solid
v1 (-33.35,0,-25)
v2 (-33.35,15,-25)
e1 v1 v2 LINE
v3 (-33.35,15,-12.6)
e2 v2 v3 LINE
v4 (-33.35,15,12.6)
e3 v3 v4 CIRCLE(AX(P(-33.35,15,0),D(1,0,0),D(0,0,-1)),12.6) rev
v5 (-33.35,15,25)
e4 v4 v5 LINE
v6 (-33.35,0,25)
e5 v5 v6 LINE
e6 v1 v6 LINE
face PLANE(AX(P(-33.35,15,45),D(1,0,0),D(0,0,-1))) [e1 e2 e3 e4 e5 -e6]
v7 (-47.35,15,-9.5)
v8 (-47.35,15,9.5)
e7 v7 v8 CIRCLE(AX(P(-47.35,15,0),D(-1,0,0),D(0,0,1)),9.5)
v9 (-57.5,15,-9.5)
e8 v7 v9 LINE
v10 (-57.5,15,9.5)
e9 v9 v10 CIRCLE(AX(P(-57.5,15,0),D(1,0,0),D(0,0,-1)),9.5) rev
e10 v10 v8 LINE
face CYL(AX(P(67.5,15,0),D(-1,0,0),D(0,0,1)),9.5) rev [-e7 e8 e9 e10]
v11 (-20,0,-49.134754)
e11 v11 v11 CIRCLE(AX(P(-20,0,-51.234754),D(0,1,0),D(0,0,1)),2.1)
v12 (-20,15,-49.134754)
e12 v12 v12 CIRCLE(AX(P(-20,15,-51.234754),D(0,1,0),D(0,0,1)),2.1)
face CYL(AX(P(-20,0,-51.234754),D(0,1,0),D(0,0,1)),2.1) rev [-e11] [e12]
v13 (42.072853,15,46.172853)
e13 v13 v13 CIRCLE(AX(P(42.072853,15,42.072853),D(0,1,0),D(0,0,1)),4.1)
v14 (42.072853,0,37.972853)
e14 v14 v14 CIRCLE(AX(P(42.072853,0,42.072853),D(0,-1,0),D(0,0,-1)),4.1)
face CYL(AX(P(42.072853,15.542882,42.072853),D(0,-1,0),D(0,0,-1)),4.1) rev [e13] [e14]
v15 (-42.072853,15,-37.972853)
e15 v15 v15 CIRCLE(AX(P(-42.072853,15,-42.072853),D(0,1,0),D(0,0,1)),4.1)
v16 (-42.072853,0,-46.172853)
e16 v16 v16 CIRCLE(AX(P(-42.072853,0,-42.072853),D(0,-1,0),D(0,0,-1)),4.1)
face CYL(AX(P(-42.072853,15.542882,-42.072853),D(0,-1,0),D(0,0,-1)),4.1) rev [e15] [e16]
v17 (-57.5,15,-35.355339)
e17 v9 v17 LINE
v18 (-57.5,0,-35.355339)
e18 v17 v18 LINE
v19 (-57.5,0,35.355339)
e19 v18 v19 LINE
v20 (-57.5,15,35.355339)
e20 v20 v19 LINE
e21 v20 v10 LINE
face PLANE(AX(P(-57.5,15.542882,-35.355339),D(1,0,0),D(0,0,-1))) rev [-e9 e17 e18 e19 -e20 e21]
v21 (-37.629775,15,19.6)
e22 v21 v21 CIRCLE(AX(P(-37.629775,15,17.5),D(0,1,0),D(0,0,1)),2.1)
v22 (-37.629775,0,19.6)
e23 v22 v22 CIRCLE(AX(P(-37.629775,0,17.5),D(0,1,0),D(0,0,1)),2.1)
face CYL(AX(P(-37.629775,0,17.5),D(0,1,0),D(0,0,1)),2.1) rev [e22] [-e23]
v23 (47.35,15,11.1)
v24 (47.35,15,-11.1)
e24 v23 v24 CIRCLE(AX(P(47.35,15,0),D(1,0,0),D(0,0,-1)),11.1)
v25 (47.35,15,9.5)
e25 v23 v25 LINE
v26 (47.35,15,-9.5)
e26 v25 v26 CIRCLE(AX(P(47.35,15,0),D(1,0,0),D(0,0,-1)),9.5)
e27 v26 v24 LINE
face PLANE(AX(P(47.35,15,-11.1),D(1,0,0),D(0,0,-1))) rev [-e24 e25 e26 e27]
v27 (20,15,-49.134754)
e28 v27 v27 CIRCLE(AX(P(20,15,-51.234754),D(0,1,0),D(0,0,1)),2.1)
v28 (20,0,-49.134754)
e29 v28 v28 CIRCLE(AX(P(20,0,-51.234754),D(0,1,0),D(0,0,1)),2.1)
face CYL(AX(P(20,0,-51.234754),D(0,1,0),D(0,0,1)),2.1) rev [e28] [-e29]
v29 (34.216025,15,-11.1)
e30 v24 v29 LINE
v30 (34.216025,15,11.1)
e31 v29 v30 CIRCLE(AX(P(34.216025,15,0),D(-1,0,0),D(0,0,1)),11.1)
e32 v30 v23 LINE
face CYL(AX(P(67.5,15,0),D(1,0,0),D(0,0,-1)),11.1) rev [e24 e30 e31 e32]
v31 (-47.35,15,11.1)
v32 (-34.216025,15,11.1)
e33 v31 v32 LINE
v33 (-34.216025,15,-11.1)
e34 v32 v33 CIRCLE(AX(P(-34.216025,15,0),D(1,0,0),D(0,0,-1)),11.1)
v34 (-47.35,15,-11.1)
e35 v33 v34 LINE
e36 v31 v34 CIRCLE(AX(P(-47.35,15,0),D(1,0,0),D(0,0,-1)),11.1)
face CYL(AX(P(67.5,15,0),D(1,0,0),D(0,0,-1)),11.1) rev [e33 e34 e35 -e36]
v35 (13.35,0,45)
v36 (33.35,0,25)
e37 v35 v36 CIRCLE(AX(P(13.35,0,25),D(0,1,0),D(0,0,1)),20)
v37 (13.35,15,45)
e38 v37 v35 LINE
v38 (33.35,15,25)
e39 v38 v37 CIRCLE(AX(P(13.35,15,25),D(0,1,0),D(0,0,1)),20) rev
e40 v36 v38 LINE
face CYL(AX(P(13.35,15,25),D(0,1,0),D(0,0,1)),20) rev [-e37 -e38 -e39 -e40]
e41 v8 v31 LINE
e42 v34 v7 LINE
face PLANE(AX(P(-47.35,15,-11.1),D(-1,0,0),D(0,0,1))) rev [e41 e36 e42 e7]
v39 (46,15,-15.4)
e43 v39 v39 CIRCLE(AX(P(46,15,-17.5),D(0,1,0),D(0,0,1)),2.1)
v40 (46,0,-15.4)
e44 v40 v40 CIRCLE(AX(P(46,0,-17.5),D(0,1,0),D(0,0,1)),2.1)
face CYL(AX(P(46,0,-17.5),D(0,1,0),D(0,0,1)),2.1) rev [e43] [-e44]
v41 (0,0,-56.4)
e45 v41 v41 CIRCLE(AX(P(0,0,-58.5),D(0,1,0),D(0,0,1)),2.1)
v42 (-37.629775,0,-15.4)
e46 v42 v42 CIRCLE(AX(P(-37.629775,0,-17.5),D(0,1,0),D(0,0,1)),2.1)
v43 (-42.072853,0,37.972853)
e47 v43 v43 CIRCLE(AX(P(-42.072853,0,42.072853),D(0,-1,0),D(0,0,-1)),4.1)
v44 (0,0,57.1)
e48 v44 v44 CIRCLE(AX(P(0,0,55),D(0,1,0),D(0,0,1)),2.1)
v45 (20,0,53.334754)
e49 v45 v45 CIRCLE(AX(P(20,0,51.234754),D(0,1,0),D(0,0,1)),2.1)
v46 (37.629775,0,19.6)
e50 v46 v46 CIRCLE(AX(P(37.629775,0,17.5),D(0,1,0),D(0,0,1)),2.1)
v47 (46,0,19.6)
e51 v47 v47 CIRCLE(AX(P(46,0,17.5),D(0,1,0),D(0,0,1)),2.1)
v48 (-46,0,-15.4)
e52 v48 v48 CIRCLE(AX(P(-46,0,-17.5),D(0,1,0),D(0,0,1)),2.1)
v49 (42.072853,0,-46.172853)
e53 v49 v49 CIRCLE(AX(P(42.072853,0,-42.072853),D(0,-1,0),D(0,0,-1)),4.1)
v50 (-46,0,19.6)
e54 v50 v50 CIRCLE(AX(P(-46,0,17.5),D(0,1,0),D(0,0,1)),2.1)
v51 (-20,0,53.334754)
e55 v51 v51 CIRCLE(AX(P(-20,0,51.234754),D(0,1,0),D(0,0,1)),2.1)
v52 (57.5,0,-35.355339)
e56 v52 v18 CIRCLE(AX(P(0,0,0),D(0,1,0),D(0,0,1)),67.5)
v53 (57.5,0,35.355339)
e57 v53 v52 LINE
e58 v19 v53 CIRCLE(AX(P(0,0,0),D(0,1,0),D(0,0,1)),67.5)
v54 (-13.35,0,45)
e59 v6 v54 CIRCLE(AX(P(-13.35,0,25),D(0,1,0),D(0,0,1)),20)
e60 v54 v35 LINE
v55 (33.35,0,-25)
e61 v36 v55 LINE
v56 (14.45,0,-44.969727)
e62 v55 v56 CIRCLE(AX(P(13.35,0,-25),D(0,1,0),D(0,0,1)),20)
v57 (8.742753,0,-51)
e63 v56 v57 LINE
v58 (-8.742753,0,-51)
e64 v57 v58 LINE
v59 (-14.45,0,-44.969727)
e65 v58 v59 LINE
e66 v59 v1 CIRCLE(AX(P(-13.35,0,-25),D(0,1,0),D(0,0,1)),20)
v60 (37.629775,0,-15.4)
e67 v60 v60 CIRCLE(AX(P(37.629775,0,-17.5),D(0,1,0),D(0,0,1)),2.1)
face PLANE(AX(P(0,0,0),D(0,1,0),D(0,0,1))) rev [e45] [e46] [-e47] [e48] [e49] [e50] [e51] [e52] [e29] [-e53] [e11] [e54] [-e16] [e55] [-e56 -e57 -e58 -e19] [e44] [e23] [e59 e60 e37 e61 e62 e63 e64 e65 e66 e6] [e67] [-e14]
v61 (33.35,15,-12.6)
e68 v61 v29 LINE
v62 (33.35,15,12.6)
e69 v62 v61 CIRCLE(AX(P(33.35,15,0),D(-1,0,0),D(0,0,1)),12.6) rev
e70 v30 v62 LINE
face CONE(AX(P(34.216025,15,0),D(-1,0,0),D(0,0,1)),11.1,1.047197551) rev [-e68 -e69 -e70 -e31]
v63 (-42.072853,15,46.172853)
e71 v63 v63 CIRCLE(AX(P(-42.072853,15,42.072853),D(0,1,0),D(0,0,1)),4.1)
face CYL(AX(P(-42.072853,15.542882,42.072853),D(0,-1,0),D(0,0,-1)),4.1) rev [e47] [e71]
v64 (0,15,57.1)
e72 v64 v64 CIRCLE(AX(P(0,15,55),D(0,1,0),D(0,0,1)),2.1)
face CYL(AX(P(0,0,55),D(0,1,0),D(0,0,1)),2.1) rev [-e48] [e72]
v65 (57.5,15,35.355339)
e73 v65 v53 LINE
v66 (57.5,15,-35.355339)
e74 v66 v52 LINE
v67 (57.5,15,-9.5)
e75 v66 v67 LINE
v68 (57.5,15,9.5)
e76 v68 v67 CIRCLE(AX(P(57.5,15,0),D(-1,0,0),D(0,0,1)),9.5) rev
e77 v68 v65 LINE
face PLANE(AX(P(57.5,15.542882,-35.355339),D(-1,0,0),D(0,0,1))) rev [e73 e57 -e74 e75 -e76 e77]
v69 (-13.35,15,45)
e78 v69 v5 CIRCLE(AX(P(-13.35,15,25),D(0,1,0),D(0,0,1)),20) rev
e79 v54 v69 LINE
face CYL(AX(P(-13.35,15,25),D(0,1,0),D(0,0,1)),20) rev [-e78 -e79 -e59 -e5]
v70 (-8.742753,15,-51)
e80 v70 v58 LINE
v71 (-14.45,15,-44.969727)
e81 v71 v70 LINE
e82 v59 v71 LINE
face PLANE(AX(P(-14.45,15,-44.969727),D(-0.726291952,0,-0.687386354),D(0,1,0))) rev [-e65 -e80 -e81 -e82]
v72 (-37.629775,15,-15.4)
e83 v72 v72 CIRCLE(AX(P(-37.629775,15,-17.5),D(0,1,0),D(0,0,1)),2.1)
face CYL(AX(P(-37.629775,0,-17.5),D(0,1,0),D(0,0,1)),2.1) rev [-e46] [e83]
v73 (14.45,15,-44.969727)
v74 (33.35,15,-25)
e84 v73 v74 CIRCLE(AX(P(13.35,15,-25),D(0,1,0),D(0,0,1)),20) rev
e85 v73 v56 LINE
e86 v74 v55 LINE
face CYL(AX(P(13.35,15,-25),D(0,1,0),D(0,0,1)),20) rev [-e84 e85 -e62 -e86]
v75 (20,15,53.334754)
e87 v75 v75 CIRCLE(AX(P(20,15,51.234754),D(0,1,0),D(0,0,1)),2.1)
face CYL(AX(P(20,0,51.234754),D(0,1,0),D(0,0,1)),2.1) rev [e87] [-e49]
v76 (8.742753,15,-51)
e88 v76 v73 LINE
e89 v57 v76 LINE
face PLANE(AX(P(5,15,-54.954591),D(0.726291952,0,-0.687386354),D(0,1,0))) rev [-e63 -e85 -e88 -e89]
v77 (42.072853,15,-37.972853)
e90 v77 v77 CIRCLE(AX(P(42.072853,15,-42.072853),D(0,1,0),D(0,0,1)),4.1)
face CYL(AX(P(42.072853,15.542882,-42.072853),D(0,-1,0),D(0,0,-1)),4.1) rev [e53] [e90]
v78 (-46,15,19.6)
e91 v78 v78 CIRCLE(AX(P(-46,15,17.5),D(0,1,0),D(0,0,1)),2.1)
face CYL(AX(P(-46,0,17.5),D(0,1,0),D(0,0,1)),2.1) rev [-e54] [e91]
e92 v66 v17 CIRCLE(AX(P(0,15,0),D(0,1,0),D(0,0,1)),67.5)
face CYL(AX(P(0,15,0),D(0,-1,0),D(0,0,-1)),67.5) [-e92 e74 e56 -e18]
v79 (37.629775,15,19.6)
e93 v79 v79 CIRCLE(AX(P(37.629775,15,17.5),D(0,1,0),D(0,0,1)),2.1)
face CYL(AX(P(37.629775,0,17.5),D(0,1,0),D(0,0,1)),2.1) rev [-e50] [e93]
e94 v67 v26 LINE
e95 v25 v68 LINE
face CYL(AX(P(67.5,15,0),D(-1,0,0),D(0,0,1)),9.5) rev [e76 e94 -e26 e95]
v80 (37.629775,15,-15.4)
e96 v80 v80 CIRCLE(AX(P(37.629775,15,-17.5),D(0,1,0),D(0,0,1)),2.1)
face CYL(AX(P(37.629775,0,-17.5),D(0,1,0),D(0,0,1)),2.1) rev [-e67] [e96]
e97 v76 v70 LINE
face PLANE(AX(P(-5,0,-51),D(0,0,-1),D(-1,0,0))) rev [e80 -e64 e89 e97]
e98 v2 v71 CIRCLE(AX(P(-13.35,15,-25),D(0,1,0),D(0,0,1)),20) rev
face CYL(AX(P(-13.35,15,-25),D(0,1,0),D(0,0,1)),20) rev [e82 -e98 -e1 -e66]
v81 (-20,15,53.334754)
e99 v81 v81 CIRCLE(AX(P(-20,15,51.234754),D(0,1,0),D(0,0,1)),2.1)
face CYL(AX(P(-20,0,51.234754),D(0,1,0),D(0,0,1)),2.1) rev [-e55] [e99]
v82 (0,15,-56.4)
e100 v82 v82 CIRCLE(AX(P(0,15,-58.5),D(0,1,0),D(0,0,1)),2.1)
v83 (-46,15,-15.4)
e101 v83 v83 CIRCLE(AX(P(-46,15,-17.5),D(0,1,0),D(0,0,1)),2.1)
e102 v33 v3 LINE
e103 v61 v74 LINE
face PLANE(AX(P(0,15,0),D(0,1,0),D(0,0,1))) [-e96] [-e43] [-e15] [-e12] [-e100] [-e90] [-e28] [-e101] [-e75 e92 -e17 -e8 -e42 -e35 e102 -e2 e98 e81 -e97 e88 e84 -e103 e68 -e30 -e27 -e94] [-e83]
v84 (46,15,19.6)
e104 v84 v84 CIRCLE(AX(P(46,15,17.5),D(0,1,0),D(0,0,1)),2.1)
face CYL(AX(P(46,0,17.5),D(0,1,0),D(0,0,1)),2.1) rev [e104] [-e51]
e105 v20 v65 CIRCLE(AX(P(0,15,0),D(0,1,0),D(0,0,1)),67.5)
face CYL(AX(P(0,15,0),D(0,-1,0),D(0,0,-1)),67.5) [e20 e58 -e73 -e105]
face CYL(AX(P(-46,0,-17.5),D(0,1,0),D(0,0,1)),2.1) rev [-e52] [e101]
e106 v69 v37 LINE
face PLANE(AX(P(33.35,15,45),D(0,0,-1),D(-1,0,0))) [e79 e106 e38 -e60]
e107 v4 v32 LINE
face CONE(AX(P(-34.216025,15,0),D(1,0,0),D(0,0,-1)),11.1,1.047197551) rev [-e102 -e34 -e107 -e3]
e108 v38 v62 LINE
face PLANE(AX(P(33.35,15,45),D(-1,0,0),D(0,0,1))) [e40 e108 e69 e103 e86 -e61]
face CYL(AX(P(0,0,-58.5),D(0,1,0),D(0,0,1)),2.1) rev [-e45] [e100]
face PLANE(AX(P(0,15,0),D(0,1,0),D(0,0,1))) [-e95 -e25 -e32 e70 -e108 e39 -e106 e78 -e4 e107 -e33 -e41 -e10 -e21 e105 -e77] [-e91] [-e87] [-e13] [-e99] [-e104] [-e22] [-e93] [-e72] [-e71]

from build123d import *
from OCP.BRepFilletAPI import BRepFilletAPI_MakeChamfer

# Parameters (mm, degrees)
SKETCH2_R               = 67.5
SKETCH2_W               = 66.7
SKETCH2_H               = 90
BOSS_EXTRUDE1_DEPTH     = 15
SKETCH7_W               = 14
SKETCH7_H               = 11.1
CUT_EXTRUDE1_DEPTH      = 135.058839694
CUT_EXTRUDE1_DEPTH_BACK = 135.058839694
SKETCH8_R               = 9.5
FILLET1_R               = 20
SKETCH9_R               = 2.1
CUT_EXTRUDE2_DEPTH      = 97.630740606
CHAMFER1_SIZE           = 1.5
CHAMFER1_SIZE2          = 0.866025404
SKETCH10_R              = 4.1
CUT_EXTRUDE3_DEPTH      = 97.630740606
CUT_EXTRUDE4_DEPTH      = 97.630740606
SKETCH12_W              = 10
SKETCH12_H              = 6
CUT_EXTRUDE5_DEPTH      = 97.630740606
CHAMFER2_START          = -1
CHAMFER2_DEPTH          = 16
CUT_EXTRUDE6_DEPTH      = 97.630740606


with BuildPart() as part:
    # Sketch2 → Boss-Extrude1 (new body)
    with BuildSketch(Plane(origin=(0, 0, 0), x_dir=(1, 0, 0), z_dir=(0, 1, 0))):
        with Locations(Location((0, 0, 0), (0, 0, 270))):
            Circle(SKETCH2_R)
        Rectangle(SKETCH2_W, SKETCH2_H, mode=Mode.SUBTRACT)
    extrude(amount=BOSS_EXTRUDE1_DEPTH)

    # Sketch7 → Cut-Revolve2 (revolve, cut)
    with BuildSketch(Plane(origin=(0, 15, 0), x_dir=(1, 0, 0), z_dir=(0, 1, 0))):
        with Locations((-40.35, 5.55)):
            Rectangle(SKETCH7_W, SKETCH7_H)
        with Locations((40.35, 5.55)):
            Rectangle(SKETCH7_W, SKETCH7_H)
    revolve(axis=Axis((67.5, 15, 0), (-1, 0, 0)), mode=Mode.SUBTRACT)

    # Sketch8 → Cut-Extrude1 (cut, two sides: drawn at the far end of the back side and taken through both)
    with BuildSketch(Plane.ZY.offset(-47.35).offset(-CUT_EXTRUDE1_DEPTH_BACK)):
        with Locations((0, 15)):
            Circle(SKETCH8_R)
    extrude(amount=CUT_EXTRUDE1_DEPTH + CUT_EXTRUDE1_DEPTH_BACK, mode=Mode.SUBTRACT)

    # Fillet1
    fillet1_edges = [part.edges().sort_by_distance(p)[0] for p in [
        (-33.35, 7.5, -45),
        (-33.35, 7.5, 45),
        (33.35, 7.5, 45),
        (33.35, 7.5, -45),
    ]]
    fillet(fillet1_edges, radius=FILLET1_R)

    # Sketch9 → Cut-Extrude2 (cut, through all)
    with BuildSketch(Plane(origin=(0, 15, 0), x_dir=(1, 0, 0), z_dir=(0, 1, 0))):
        with Locations(Location((-37.629775444, 17.5, 0), (0, 0, 270))):
            Circle(SKETCH9_R)
        with Locations(Location((37.629775444, 17.5, 0), (0, 0, 270))):
            Circle(SKETCH9_R)
        with Locations(Location((37.629775444, -17.5, 0), (0, 0, 270))):
            Circle(SKETCH9_R)
        with Locations(Location((-37.629775444, -17.5, 0), (0, 0, 270))):
            Circle(SKETCH9_R)
        with Locations(Location((-20, 51.23475383, 0), (0, 0, 270))):
            Circle(SKETCH9_R)
        with Locations(Location((20, 51.23475383, 0), (0, 0, 270))):
            Circle(SKETCH9_R)
        with Locations(Location((20, -51.23475383, 0), (0, 0, 270))):
            Circle(SKETCH9_R)
        with Locations(Location((-20, -51.23475383, 0), (0, 0, 270))):
            Circle(SKETCH9_R)
        with Locations(Location((0, -55, 0), (0, 0, 270))):
            Circle(SKETCH9_R)
        with Locations(Location((0, 58.5, 0), (0, 0, 270))):
            Circle(SKETCH9_R)
        with Locations(Location((-46, 17.5, 0), (0, 0, 270))):
            Circle(SKETCH9_R)
        with Locations(Location((46, 17.5, 0), (0, 0, 270))):
            Circle(SKETCH9_R)
        with Locations(Location((46, -17.5, 0), (0, 0, 270))):
            Circle(SKETCH9_R)
        with Locations(Location((-46, -17.5, 0), (0, 0, 270))):
            Circle(SKETCH9_R)
    extrude(amount=-CUT_EXTRUDE2_DEPTH, mode=Mode.SUBTRACT)

    # Chamfer1: one chamfer whose edges measure the first distance from different faces: ONE call of the kernel's chamfer builder (chamfer() names one face for all edges)
    chamfer1_edges_1 = [part.edges().sort_by_distance(p)[0] for p in [
        (-33.35, 3.9, 0),
    ]]
    chamfer1_side_1 = [part.faces().sort_by_distance(p)[0] for p in [
        (-33.35, 0.522015325, 0),
    ]]
    chamfer1_edges_2 = [part.edges().sort_by_distance(p)[0] for p in [
        (33.35, 3.9, 0),
    ]]
    chamfer1_side_2 = [part.faces().sort_by_distance(p)[0] for p in [
        (33.35, 0.522015325, 0),
    ]]
    chamfer1 = BRepFilletAPI_MakeChamfer(part.part.solid().wrapped)
    for e in chamfer1_edges_1:
        chamfer1.Add(CHAMFER1_SIZE, CHAMFER1_SIZE2, e.wrapped, chamfer1_side_1[0].wrapped)  # the first distance lies on this face
    for e in chamfer1_edges_2:
        chamfer1.Add(CHAMFER1_SIZE, CHAMFER1_SIZE2, e.wrapped, chamfer1_side_2[0].wrapped)  # the first distance lies on this face
    add(Compound.cast(chamfer1.Shape()), mode=Mode.REPLACE)

    # Sketch10 → Cut-Extrude3 (cut, through all)
    with BuildSketch(Plane.XZ):
        with Locations(Location((42.072853481, -42.072853481, 0), (0, 0, 270))):
            Circle(SKETCH10_R)
        with Locations(Location((-42.072853481, -42.072853481, 0), (0, 0, 270))):
            Circle(SKETCH10_R)
        with Locations(Location((-42.072853481, 42.072853481, 0), (0, 0, 270))):
            Circle(SKETCH10_R)
        with Locations(Location((42.072853481, 42.072853481, 0), (0, 0, 270))):
            Circle(SKETCH10_R)
    extrude(amount=-CUT_EXTRUDE3_DEPTH, mode=Mode.SUBTRACT)

    # Sketch11 → Cut-Extrude4 (cut, through all)
    with BuildSketch(Plane.XZ):
        with BuildLine():
            Line((57.5, -35.355339059), (57.5, 35.355339059))
            ThreePointArc((57.5, 35.355339059), (67.5, 0), (57.5, -35.355339059))
        make_face()
    extrude(amount=-CUT_EXTRUDE4_DEPTH, mode=Mode.SUBTRACT)

    # Sketch12 → Cut-Extrude5 (cut, through all)
    with BuildSketch(Plane(origin=(0, 15, 0), x_dir=(1, 0, 0), z_dir=(0, 1, 0))):
        with Locations((0, 48)):
            Rectangle(SKETCH12_W, SKETCH12_H)
    extrude(amount=-CUT_EXTRUDE5_DEPTH, mode=Mode.SUBTRACT)

    # Chamfer2: read off the stored shape, not the designer's step
    # Chamfer2 outline → Chamfer2 (cut)
    with BuildSketch(Plane(origin=(0, 0, 0), x_dir=(1, 0, 0), z_dir=(0, 1, 0)).offset(CHAMFER2_START)):
        with BuildLine():
            Line((14.45, 44.969727089), (8.74275335, 51))
            Line((8.74275335, 51), (5, 51))
            Line((5, 51), (5, 45))
            Line((5, 45), (13.35, 45))
            ThreePointArc((13.35, 45), (13.900208244, 44.99243034), (14.45, 44.969727089))
        make_face()
        with BuildLine():
            Line((-5, 45), (-5, 51))
            Line((-5, 51), (-8.74275335, 51))
            Line((-8.74275335, 51), (-14.45, 44.969727089))
            ThreePointArc((-14.45, 44.969727089), (-13.900208244, 44.99243034), (-13.35, 45))
            Line((-13.35, 45), (-5, 45))
        make_face()
    extrude(amount=CHAMFER2_DEPTH, mode=Mode.SUBTRACT)

    # Sketch13 → Cut-Extrude6 (cut, through all)
    with BuildSketch(Plane.XZ):
        with BuildLine():
            Line((-57.5, -35.355339059), (-57.5, 35.355339059))
            ThreePointArc((-57.5, 35.355339059), (-67.5, 0), (-57.5, -35.355339059))
        make_face()
    extrude(amount=-CUT_EXTRUDE6_DEPTH, mode=Mode.SUBTRACT)


solid = part.part
